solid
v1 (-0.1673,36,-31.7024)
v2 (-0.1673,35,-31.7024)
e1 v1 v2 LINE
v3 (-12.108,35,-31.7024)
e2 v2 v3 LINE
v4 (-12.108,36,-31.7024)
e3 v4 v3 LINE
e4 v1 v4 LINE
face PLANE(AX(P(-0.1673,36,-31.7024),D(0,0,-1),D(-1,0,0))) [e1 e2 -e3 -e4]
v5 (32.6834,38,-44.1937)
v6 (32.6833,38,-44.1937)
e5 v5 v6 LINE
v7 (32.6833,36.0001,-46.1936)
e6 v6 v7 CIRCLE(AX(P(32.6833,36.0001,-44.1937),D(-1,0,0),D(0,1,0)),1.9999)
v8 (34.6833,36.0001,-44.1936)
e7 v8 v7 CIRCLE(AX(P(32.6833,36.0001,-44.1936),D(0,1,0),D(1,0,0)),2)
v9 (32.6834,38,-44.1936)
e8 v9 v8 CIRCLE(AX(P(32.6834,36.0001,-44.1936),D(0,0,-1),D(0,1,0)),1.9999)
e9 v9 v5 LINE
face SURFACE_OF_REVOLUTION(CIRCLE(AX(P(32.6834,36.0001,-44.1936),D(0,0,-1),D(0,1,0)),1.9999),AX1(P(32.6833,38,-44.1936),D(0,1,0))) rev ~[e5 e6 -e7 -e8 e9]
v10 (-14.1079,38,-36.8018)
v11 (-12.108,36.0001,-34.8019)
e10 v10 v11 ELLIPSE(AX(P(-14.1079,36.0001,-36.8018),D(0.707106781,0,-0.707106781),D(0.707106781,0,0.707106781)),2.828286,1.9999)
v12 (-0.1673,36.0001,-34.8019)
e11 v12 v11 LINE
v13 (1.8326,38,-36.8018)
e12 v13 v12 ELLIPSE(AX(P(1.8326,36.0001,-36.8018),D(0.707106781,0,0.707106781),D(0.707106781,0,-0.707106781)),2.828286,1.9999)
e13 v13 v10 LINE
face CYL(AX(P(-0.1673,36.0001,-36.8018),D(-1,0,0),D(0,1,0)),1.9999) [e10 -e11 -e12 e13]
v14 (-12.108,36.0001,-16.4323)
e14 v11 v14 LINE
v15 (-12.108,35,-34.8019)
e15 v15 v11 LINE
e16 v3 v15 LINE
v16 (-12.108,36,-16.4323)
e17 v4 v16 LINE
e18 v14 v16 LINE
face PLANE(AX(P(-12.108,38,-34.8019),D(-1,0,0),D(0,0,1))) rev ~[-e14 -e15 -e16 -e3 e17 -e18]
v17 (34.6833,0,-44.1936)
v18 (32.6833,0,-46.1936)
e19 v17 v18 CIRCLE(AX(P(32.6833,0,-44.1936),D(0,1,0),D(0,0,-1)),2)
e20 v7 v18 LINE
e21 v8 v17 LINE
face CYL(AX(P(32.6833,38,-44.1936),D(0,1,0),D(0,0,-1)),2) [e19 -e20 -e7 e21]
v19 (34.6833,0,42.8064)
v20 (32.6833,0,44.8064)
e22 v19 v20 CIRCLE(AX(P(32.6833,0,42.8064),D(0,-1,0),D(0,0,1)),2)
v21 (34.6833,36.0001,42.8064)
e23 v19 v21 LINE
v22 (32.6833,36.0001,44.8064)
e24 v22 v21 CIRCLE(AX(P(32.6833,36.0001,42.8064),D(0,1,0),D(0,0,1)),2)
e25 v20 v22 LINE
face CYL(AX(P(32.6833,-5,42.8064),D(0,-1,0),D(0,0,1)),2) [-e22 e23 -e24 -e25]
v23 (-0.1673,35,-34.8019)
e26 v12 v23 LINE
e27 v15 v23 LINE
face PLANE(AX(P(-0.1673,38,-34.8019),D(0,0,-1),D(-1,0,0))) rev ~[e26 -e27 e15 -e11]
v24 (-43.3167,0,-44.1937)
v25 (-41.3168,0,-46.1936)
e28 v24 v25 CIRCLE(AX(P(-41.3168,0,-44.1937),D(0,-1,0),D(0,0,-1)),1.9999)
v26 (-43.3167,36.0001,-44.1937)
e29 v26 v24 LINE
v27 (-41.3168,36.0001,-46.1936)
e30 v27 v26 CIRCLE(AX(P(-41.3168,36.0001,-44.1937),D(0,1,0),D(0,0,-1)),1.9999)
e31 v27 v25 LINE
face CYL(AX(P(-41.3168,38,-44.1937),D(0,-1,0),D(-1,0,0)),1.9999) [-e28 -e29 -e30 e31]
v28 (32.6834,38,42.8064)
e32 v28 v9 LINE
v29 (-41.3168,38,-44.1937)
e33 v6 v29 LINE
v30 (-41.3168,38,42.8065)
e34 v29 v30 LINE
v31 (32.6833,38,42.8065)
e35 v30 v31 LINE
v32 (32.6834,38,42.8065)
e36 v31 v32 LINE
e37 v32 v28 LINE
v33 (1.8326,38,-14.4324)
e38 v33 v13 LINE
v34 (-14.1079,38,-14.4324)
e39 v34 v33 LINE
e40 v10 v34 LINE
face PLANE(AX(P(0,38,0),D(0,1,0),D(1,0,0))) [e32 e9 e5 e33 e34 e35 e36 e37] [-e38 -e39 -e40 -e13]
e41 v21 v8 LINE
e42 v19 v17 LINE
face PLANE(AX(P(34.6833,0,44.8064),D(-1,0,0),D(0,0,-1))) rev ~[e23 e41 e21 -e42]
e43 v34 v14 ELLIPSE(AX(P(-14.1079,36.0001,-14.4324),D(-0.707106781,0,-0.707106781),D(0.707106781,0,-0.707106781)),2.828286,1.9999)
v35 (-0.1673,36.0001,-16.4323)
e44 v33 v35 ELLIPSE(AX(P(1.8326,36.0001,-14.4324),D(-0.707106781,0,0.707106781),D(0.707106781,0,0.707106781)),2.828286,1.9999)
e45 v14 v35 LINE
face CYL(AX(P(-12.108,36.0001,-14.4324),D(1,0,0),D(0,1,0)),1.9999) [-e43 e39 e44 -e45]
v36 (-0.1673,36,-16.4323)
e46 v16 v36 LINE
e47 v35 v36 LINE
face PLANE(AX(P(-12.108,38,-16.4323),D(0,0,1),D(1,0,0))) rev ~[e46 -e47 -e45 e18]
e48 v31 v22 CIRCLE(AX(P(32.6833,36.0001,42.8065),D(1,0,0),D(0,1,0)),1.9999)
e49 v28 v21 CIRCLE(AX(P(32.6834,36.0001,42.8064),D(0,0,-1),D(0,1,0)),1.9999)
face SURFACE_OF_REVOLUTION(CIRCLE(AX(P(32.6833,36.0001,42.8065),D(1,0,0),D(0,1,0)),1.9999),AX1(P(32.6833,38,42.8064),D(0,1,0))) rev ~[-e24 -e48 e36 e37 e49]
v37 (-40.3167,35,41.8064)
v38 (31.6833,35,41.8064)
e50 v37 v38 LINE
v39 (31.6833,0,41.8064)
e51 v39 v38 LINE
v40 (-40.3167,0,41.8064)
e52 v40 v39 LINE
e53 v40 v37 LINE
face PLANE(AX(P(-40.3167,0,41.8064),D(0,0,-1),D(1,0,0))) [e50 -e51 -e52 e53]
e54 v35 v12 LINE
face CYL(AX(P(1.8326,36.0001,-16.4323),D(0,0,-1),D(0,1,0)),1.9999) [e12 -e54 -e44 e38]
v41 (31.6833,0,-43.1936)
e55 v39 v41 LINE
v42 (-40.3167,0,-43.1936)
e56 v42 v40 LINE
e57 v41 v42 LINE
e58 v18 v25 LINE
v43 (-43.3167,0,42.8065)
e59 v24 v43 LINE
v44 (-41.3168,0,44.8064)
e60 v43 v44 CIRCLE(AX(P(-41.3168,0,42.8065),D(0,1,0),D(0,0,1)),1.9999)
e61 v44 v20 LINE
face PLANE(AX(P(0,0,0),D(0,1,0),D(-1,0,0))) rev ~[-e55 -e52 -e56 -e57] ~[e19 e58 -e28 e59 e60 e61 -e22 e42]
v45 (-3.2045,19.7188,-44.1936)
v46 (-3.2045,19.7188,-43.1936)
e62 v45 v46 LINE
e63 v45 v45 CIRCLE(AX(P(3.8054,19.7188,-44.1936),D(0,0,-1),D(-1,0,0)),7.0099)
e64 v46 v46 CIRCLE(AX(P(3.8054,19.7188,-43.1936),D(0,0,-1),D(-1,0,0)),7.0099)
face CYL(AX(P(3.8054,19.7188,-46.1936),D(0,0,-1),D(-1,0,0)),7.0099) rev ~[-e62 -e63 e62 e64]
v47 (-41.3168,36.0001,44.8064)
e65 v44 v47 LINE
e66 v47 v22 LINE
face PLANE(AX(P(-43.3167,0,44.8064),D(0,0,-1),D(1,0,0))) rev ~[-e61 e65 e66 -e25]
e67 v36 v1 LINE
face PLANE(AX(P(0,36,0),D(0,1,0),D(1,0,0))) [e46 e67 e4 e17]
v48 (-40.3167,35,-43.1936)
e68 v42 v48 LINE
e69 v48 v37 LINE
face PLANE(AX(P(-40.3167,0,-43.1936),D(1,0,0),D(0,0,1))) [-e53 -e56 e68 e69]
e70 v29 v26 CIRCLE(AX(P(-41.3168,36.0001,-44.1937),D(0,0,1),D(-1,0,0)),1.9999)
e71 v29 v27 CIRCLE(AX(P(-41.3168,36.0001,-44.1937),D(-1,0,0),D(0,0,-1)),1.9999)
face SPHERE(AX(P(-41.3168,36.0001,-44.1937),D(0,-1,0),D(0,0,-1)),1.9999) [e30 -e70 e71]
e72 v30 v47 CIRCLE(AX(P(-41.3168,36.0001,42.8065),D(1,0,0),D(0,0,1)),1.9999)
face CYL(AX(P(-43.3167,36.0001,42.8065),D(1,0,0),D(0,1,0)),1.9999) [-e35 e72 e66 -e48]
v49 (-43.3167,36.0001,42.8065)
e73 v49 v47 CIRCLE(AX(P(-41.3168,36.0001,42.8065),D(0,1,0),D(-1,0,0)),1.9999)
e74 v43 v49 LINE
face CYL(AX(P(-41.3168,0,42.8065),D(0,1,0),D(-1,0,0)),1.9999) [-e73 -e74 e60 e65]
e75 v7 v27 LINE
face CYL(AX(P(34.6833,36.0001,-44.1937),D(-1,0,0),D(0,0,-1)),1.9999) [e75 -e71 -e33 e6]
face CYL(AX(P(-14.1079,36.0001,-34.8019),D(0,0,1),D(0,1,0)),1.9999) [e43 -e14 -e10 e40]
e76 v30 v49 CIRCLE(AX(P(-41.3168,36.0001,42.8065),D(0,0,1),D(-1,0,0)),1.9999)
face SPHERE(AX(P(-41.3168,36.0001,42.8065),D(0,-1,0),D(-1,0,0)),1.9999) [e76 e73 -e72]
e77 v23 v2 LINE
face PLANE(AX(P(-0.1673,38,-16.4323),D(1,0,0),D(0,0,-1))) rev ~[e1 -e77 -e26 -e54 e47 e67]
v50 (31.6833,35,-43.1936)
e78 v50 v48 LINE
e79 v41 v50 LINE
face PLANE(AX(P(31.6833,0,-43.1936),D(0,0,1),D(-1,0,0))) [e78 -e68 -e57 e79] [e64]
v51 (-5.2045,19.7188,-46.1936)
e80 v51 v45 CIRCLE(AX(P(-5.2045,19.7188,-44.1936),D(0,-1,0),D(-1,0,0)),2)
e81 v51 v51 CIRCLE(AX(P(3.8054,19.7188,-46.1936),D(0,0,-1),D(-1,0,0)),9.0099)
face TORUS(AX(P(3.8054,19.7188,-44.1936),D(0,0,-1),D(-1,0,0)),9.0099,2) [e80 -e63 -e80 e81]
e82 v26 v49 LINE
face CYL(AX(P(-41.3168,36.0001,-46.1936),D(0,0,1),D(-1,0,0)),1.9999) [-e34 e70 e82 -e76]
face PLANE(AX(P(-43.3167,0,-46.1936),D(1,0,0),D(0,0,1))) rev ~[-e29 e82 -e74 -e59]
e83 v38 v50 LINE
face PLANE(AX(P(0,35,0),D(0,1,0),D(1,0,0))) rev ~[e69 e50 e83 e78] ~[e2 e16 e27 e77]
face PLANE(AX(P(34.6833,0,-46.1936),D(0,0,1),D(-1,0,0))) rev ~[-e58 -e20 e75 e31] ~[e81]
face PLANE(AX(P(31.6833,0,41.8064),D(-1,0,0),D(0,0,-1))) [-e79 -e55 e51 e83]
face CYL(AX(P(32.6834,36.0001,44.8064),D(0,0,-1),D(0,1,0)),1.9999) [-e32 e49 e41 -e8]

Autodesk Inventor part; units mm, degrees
ref_plane "YZ Plane" through (0, 0, 0) normal (1, 0, 0) x (0, 1, 0)
ref_plane "XZ Plane" through (0, 0, 0) normal (0, 1, 0) x (-1, 0, 0)
ref_plane "XY Plane" through (0, 0, 0) normal (0, 0, 1) x (1, 0, 0)
sketch "Sketch1" plane through (0, 0, 0) normal (0, 1, 0) x (-1, 0, 0)
  line L0 (40.3167, 41.8064) -> (-31.6833, 41.8064)
  line L1 (-31.6833, 41.8064) -> (-31.6833, -43.1936)
  line L2 (-31.6833, -43.1936) -> (40.3167, -43.1936)
  line L3 (40.3167, -43.1936) -> (40.3167, 41.8064)
  line L4 (43.3167, 44.8064) -> (-34.6833, 44.8064)
  line L5 (-34.6833, 44.8064) -> (-34.6833, -46.1936)
  line L6 (-34.6833, -46.1936) -> (43.3167, -46.1936)
  line L7 (43.3167, -46.1936) -> (43.3167, 44.8064)
  point P0 (0, 0)
  dimension "d0" = 85
  dimension "d1" = 72
  dimension "d2" = 3
  dimension "d3" = 3
  dimension "d4" = 3
  dimension "d5" = 3
extrude "Extrusion1" add sketch "Sketch1" along normal blind 35
sketch "Sketch2" plane through (0, 35, 0) normal (0, 1, 0) x (1, 0, 0)
  line L0 (34.6833, -44.8064) -> (34.6833, 46.1936) projected
  line L1 (-43.3167, -44.8064) -> (34.6833, -44.8064)
  line L2 (34.6833, -44.8064) -> (34.6833, 46.1936)
  line L3 (34.6833, 46.1936) -> (-43.3167, 46.1936)
  line L4 (-43.3167, 46.1936) -> (-43.3167, -44.8064)
  point P0 (0, 0)
  point P1 (34.6833, -44.8064)
extrude "Extrusion2" add sketch "Sketch2" along normal blind 3
sketch "Sketch3" plane through (34.6833, 0, 44.8064) normal (1, 0, 0) x (0, 0, -1)
  point P0 (44.8064, 0)
sketch "Sketch4" plane through (34.6833, 0, -46.1936) normal (0, 0, -1) x (-1, 0, 0)
  circle A0 centre (30.8779, 19.7188) radius 7.0099
  point P0 (34.6833, 0)
extrude "Extrusion3" cut sketch "Sketch4" against normal blind 35
sketch "Sketch5" plane through (0, 38, 0) normal (0, 1, 0) x (1, 0, 0)
  line L0 (-12.108, 16.4323) -> (-0.1673, 16.4323)
  line L1 (-0.1673, 16.4323) -> (-0.1673, 34.8019)
  line L2 (-0.1673, 34.8019) -> (-12.108, 34.8019)
  line L3 (-12.108, 34.8019) -> (-12.108, 16.4323)
  point P0 (0, 0)
extrude "Extrusion4" cut sketch "Sketch5" against normal blind 2
sketch "Sketch6" plane through (0, 36, 0) normal (0, 1, 0) x (1, 0, 0)
  point P0 (0, 0)
sketch "Sketch7" plane through (0, 36, 0) normal (0, 1, 0) x (1, 0, 0)
  line L0 (-12.108, 34.8019) -> (-0.1673, 34.8019) projected
  line L1 (-0.1673, 34.8019) -> (-0.1673, 16.4323) projected
  line L2 (-12.108, 34.8019) -> (-0.1673, 34.8019)
  line L3 (-0.1673, 34.8019) -> (-0.1673, 31.7024)
  line L4 (-0.1673, 31.7024) -> (-12.108, 31.7024)
  line L5 (-12.108, 31.7024) -> (-12.108, 34.8019)
  point P0 (0, 0)
extrude "Extrusion5" cut sketch "Sketch7" against normal blind 5
fillet "Fillet1" radius 2 10 edges at (-43.3167, 19, 44.8064) (-43.3167, 19, -46.1936) (-4.3167, 38, -46.1936) (-43.3167, 38, -0.6936) (34.6833, 38, -0.6936) (-6.1377, 38, -16.4323) (-0.1673, 38, -25.6171) (-12.108, 38, -25.6171) (-6.1377, 38, -34.8019) (-4.3167, 38, 44.8064)
fillet "Fillet2" radius 2 4 edges at (34.0975, 37.4142, 44.2206) (34.6833, 18.0001, 44.8064) (34.0975, 37.4142, -45.6079) (34.6833, 18.0001, -46.1936)
fillet "Fillet3" radius 2 1 edges at (10.8153, 19.7188, -46.1936)
properties part number "198MainChassis"
